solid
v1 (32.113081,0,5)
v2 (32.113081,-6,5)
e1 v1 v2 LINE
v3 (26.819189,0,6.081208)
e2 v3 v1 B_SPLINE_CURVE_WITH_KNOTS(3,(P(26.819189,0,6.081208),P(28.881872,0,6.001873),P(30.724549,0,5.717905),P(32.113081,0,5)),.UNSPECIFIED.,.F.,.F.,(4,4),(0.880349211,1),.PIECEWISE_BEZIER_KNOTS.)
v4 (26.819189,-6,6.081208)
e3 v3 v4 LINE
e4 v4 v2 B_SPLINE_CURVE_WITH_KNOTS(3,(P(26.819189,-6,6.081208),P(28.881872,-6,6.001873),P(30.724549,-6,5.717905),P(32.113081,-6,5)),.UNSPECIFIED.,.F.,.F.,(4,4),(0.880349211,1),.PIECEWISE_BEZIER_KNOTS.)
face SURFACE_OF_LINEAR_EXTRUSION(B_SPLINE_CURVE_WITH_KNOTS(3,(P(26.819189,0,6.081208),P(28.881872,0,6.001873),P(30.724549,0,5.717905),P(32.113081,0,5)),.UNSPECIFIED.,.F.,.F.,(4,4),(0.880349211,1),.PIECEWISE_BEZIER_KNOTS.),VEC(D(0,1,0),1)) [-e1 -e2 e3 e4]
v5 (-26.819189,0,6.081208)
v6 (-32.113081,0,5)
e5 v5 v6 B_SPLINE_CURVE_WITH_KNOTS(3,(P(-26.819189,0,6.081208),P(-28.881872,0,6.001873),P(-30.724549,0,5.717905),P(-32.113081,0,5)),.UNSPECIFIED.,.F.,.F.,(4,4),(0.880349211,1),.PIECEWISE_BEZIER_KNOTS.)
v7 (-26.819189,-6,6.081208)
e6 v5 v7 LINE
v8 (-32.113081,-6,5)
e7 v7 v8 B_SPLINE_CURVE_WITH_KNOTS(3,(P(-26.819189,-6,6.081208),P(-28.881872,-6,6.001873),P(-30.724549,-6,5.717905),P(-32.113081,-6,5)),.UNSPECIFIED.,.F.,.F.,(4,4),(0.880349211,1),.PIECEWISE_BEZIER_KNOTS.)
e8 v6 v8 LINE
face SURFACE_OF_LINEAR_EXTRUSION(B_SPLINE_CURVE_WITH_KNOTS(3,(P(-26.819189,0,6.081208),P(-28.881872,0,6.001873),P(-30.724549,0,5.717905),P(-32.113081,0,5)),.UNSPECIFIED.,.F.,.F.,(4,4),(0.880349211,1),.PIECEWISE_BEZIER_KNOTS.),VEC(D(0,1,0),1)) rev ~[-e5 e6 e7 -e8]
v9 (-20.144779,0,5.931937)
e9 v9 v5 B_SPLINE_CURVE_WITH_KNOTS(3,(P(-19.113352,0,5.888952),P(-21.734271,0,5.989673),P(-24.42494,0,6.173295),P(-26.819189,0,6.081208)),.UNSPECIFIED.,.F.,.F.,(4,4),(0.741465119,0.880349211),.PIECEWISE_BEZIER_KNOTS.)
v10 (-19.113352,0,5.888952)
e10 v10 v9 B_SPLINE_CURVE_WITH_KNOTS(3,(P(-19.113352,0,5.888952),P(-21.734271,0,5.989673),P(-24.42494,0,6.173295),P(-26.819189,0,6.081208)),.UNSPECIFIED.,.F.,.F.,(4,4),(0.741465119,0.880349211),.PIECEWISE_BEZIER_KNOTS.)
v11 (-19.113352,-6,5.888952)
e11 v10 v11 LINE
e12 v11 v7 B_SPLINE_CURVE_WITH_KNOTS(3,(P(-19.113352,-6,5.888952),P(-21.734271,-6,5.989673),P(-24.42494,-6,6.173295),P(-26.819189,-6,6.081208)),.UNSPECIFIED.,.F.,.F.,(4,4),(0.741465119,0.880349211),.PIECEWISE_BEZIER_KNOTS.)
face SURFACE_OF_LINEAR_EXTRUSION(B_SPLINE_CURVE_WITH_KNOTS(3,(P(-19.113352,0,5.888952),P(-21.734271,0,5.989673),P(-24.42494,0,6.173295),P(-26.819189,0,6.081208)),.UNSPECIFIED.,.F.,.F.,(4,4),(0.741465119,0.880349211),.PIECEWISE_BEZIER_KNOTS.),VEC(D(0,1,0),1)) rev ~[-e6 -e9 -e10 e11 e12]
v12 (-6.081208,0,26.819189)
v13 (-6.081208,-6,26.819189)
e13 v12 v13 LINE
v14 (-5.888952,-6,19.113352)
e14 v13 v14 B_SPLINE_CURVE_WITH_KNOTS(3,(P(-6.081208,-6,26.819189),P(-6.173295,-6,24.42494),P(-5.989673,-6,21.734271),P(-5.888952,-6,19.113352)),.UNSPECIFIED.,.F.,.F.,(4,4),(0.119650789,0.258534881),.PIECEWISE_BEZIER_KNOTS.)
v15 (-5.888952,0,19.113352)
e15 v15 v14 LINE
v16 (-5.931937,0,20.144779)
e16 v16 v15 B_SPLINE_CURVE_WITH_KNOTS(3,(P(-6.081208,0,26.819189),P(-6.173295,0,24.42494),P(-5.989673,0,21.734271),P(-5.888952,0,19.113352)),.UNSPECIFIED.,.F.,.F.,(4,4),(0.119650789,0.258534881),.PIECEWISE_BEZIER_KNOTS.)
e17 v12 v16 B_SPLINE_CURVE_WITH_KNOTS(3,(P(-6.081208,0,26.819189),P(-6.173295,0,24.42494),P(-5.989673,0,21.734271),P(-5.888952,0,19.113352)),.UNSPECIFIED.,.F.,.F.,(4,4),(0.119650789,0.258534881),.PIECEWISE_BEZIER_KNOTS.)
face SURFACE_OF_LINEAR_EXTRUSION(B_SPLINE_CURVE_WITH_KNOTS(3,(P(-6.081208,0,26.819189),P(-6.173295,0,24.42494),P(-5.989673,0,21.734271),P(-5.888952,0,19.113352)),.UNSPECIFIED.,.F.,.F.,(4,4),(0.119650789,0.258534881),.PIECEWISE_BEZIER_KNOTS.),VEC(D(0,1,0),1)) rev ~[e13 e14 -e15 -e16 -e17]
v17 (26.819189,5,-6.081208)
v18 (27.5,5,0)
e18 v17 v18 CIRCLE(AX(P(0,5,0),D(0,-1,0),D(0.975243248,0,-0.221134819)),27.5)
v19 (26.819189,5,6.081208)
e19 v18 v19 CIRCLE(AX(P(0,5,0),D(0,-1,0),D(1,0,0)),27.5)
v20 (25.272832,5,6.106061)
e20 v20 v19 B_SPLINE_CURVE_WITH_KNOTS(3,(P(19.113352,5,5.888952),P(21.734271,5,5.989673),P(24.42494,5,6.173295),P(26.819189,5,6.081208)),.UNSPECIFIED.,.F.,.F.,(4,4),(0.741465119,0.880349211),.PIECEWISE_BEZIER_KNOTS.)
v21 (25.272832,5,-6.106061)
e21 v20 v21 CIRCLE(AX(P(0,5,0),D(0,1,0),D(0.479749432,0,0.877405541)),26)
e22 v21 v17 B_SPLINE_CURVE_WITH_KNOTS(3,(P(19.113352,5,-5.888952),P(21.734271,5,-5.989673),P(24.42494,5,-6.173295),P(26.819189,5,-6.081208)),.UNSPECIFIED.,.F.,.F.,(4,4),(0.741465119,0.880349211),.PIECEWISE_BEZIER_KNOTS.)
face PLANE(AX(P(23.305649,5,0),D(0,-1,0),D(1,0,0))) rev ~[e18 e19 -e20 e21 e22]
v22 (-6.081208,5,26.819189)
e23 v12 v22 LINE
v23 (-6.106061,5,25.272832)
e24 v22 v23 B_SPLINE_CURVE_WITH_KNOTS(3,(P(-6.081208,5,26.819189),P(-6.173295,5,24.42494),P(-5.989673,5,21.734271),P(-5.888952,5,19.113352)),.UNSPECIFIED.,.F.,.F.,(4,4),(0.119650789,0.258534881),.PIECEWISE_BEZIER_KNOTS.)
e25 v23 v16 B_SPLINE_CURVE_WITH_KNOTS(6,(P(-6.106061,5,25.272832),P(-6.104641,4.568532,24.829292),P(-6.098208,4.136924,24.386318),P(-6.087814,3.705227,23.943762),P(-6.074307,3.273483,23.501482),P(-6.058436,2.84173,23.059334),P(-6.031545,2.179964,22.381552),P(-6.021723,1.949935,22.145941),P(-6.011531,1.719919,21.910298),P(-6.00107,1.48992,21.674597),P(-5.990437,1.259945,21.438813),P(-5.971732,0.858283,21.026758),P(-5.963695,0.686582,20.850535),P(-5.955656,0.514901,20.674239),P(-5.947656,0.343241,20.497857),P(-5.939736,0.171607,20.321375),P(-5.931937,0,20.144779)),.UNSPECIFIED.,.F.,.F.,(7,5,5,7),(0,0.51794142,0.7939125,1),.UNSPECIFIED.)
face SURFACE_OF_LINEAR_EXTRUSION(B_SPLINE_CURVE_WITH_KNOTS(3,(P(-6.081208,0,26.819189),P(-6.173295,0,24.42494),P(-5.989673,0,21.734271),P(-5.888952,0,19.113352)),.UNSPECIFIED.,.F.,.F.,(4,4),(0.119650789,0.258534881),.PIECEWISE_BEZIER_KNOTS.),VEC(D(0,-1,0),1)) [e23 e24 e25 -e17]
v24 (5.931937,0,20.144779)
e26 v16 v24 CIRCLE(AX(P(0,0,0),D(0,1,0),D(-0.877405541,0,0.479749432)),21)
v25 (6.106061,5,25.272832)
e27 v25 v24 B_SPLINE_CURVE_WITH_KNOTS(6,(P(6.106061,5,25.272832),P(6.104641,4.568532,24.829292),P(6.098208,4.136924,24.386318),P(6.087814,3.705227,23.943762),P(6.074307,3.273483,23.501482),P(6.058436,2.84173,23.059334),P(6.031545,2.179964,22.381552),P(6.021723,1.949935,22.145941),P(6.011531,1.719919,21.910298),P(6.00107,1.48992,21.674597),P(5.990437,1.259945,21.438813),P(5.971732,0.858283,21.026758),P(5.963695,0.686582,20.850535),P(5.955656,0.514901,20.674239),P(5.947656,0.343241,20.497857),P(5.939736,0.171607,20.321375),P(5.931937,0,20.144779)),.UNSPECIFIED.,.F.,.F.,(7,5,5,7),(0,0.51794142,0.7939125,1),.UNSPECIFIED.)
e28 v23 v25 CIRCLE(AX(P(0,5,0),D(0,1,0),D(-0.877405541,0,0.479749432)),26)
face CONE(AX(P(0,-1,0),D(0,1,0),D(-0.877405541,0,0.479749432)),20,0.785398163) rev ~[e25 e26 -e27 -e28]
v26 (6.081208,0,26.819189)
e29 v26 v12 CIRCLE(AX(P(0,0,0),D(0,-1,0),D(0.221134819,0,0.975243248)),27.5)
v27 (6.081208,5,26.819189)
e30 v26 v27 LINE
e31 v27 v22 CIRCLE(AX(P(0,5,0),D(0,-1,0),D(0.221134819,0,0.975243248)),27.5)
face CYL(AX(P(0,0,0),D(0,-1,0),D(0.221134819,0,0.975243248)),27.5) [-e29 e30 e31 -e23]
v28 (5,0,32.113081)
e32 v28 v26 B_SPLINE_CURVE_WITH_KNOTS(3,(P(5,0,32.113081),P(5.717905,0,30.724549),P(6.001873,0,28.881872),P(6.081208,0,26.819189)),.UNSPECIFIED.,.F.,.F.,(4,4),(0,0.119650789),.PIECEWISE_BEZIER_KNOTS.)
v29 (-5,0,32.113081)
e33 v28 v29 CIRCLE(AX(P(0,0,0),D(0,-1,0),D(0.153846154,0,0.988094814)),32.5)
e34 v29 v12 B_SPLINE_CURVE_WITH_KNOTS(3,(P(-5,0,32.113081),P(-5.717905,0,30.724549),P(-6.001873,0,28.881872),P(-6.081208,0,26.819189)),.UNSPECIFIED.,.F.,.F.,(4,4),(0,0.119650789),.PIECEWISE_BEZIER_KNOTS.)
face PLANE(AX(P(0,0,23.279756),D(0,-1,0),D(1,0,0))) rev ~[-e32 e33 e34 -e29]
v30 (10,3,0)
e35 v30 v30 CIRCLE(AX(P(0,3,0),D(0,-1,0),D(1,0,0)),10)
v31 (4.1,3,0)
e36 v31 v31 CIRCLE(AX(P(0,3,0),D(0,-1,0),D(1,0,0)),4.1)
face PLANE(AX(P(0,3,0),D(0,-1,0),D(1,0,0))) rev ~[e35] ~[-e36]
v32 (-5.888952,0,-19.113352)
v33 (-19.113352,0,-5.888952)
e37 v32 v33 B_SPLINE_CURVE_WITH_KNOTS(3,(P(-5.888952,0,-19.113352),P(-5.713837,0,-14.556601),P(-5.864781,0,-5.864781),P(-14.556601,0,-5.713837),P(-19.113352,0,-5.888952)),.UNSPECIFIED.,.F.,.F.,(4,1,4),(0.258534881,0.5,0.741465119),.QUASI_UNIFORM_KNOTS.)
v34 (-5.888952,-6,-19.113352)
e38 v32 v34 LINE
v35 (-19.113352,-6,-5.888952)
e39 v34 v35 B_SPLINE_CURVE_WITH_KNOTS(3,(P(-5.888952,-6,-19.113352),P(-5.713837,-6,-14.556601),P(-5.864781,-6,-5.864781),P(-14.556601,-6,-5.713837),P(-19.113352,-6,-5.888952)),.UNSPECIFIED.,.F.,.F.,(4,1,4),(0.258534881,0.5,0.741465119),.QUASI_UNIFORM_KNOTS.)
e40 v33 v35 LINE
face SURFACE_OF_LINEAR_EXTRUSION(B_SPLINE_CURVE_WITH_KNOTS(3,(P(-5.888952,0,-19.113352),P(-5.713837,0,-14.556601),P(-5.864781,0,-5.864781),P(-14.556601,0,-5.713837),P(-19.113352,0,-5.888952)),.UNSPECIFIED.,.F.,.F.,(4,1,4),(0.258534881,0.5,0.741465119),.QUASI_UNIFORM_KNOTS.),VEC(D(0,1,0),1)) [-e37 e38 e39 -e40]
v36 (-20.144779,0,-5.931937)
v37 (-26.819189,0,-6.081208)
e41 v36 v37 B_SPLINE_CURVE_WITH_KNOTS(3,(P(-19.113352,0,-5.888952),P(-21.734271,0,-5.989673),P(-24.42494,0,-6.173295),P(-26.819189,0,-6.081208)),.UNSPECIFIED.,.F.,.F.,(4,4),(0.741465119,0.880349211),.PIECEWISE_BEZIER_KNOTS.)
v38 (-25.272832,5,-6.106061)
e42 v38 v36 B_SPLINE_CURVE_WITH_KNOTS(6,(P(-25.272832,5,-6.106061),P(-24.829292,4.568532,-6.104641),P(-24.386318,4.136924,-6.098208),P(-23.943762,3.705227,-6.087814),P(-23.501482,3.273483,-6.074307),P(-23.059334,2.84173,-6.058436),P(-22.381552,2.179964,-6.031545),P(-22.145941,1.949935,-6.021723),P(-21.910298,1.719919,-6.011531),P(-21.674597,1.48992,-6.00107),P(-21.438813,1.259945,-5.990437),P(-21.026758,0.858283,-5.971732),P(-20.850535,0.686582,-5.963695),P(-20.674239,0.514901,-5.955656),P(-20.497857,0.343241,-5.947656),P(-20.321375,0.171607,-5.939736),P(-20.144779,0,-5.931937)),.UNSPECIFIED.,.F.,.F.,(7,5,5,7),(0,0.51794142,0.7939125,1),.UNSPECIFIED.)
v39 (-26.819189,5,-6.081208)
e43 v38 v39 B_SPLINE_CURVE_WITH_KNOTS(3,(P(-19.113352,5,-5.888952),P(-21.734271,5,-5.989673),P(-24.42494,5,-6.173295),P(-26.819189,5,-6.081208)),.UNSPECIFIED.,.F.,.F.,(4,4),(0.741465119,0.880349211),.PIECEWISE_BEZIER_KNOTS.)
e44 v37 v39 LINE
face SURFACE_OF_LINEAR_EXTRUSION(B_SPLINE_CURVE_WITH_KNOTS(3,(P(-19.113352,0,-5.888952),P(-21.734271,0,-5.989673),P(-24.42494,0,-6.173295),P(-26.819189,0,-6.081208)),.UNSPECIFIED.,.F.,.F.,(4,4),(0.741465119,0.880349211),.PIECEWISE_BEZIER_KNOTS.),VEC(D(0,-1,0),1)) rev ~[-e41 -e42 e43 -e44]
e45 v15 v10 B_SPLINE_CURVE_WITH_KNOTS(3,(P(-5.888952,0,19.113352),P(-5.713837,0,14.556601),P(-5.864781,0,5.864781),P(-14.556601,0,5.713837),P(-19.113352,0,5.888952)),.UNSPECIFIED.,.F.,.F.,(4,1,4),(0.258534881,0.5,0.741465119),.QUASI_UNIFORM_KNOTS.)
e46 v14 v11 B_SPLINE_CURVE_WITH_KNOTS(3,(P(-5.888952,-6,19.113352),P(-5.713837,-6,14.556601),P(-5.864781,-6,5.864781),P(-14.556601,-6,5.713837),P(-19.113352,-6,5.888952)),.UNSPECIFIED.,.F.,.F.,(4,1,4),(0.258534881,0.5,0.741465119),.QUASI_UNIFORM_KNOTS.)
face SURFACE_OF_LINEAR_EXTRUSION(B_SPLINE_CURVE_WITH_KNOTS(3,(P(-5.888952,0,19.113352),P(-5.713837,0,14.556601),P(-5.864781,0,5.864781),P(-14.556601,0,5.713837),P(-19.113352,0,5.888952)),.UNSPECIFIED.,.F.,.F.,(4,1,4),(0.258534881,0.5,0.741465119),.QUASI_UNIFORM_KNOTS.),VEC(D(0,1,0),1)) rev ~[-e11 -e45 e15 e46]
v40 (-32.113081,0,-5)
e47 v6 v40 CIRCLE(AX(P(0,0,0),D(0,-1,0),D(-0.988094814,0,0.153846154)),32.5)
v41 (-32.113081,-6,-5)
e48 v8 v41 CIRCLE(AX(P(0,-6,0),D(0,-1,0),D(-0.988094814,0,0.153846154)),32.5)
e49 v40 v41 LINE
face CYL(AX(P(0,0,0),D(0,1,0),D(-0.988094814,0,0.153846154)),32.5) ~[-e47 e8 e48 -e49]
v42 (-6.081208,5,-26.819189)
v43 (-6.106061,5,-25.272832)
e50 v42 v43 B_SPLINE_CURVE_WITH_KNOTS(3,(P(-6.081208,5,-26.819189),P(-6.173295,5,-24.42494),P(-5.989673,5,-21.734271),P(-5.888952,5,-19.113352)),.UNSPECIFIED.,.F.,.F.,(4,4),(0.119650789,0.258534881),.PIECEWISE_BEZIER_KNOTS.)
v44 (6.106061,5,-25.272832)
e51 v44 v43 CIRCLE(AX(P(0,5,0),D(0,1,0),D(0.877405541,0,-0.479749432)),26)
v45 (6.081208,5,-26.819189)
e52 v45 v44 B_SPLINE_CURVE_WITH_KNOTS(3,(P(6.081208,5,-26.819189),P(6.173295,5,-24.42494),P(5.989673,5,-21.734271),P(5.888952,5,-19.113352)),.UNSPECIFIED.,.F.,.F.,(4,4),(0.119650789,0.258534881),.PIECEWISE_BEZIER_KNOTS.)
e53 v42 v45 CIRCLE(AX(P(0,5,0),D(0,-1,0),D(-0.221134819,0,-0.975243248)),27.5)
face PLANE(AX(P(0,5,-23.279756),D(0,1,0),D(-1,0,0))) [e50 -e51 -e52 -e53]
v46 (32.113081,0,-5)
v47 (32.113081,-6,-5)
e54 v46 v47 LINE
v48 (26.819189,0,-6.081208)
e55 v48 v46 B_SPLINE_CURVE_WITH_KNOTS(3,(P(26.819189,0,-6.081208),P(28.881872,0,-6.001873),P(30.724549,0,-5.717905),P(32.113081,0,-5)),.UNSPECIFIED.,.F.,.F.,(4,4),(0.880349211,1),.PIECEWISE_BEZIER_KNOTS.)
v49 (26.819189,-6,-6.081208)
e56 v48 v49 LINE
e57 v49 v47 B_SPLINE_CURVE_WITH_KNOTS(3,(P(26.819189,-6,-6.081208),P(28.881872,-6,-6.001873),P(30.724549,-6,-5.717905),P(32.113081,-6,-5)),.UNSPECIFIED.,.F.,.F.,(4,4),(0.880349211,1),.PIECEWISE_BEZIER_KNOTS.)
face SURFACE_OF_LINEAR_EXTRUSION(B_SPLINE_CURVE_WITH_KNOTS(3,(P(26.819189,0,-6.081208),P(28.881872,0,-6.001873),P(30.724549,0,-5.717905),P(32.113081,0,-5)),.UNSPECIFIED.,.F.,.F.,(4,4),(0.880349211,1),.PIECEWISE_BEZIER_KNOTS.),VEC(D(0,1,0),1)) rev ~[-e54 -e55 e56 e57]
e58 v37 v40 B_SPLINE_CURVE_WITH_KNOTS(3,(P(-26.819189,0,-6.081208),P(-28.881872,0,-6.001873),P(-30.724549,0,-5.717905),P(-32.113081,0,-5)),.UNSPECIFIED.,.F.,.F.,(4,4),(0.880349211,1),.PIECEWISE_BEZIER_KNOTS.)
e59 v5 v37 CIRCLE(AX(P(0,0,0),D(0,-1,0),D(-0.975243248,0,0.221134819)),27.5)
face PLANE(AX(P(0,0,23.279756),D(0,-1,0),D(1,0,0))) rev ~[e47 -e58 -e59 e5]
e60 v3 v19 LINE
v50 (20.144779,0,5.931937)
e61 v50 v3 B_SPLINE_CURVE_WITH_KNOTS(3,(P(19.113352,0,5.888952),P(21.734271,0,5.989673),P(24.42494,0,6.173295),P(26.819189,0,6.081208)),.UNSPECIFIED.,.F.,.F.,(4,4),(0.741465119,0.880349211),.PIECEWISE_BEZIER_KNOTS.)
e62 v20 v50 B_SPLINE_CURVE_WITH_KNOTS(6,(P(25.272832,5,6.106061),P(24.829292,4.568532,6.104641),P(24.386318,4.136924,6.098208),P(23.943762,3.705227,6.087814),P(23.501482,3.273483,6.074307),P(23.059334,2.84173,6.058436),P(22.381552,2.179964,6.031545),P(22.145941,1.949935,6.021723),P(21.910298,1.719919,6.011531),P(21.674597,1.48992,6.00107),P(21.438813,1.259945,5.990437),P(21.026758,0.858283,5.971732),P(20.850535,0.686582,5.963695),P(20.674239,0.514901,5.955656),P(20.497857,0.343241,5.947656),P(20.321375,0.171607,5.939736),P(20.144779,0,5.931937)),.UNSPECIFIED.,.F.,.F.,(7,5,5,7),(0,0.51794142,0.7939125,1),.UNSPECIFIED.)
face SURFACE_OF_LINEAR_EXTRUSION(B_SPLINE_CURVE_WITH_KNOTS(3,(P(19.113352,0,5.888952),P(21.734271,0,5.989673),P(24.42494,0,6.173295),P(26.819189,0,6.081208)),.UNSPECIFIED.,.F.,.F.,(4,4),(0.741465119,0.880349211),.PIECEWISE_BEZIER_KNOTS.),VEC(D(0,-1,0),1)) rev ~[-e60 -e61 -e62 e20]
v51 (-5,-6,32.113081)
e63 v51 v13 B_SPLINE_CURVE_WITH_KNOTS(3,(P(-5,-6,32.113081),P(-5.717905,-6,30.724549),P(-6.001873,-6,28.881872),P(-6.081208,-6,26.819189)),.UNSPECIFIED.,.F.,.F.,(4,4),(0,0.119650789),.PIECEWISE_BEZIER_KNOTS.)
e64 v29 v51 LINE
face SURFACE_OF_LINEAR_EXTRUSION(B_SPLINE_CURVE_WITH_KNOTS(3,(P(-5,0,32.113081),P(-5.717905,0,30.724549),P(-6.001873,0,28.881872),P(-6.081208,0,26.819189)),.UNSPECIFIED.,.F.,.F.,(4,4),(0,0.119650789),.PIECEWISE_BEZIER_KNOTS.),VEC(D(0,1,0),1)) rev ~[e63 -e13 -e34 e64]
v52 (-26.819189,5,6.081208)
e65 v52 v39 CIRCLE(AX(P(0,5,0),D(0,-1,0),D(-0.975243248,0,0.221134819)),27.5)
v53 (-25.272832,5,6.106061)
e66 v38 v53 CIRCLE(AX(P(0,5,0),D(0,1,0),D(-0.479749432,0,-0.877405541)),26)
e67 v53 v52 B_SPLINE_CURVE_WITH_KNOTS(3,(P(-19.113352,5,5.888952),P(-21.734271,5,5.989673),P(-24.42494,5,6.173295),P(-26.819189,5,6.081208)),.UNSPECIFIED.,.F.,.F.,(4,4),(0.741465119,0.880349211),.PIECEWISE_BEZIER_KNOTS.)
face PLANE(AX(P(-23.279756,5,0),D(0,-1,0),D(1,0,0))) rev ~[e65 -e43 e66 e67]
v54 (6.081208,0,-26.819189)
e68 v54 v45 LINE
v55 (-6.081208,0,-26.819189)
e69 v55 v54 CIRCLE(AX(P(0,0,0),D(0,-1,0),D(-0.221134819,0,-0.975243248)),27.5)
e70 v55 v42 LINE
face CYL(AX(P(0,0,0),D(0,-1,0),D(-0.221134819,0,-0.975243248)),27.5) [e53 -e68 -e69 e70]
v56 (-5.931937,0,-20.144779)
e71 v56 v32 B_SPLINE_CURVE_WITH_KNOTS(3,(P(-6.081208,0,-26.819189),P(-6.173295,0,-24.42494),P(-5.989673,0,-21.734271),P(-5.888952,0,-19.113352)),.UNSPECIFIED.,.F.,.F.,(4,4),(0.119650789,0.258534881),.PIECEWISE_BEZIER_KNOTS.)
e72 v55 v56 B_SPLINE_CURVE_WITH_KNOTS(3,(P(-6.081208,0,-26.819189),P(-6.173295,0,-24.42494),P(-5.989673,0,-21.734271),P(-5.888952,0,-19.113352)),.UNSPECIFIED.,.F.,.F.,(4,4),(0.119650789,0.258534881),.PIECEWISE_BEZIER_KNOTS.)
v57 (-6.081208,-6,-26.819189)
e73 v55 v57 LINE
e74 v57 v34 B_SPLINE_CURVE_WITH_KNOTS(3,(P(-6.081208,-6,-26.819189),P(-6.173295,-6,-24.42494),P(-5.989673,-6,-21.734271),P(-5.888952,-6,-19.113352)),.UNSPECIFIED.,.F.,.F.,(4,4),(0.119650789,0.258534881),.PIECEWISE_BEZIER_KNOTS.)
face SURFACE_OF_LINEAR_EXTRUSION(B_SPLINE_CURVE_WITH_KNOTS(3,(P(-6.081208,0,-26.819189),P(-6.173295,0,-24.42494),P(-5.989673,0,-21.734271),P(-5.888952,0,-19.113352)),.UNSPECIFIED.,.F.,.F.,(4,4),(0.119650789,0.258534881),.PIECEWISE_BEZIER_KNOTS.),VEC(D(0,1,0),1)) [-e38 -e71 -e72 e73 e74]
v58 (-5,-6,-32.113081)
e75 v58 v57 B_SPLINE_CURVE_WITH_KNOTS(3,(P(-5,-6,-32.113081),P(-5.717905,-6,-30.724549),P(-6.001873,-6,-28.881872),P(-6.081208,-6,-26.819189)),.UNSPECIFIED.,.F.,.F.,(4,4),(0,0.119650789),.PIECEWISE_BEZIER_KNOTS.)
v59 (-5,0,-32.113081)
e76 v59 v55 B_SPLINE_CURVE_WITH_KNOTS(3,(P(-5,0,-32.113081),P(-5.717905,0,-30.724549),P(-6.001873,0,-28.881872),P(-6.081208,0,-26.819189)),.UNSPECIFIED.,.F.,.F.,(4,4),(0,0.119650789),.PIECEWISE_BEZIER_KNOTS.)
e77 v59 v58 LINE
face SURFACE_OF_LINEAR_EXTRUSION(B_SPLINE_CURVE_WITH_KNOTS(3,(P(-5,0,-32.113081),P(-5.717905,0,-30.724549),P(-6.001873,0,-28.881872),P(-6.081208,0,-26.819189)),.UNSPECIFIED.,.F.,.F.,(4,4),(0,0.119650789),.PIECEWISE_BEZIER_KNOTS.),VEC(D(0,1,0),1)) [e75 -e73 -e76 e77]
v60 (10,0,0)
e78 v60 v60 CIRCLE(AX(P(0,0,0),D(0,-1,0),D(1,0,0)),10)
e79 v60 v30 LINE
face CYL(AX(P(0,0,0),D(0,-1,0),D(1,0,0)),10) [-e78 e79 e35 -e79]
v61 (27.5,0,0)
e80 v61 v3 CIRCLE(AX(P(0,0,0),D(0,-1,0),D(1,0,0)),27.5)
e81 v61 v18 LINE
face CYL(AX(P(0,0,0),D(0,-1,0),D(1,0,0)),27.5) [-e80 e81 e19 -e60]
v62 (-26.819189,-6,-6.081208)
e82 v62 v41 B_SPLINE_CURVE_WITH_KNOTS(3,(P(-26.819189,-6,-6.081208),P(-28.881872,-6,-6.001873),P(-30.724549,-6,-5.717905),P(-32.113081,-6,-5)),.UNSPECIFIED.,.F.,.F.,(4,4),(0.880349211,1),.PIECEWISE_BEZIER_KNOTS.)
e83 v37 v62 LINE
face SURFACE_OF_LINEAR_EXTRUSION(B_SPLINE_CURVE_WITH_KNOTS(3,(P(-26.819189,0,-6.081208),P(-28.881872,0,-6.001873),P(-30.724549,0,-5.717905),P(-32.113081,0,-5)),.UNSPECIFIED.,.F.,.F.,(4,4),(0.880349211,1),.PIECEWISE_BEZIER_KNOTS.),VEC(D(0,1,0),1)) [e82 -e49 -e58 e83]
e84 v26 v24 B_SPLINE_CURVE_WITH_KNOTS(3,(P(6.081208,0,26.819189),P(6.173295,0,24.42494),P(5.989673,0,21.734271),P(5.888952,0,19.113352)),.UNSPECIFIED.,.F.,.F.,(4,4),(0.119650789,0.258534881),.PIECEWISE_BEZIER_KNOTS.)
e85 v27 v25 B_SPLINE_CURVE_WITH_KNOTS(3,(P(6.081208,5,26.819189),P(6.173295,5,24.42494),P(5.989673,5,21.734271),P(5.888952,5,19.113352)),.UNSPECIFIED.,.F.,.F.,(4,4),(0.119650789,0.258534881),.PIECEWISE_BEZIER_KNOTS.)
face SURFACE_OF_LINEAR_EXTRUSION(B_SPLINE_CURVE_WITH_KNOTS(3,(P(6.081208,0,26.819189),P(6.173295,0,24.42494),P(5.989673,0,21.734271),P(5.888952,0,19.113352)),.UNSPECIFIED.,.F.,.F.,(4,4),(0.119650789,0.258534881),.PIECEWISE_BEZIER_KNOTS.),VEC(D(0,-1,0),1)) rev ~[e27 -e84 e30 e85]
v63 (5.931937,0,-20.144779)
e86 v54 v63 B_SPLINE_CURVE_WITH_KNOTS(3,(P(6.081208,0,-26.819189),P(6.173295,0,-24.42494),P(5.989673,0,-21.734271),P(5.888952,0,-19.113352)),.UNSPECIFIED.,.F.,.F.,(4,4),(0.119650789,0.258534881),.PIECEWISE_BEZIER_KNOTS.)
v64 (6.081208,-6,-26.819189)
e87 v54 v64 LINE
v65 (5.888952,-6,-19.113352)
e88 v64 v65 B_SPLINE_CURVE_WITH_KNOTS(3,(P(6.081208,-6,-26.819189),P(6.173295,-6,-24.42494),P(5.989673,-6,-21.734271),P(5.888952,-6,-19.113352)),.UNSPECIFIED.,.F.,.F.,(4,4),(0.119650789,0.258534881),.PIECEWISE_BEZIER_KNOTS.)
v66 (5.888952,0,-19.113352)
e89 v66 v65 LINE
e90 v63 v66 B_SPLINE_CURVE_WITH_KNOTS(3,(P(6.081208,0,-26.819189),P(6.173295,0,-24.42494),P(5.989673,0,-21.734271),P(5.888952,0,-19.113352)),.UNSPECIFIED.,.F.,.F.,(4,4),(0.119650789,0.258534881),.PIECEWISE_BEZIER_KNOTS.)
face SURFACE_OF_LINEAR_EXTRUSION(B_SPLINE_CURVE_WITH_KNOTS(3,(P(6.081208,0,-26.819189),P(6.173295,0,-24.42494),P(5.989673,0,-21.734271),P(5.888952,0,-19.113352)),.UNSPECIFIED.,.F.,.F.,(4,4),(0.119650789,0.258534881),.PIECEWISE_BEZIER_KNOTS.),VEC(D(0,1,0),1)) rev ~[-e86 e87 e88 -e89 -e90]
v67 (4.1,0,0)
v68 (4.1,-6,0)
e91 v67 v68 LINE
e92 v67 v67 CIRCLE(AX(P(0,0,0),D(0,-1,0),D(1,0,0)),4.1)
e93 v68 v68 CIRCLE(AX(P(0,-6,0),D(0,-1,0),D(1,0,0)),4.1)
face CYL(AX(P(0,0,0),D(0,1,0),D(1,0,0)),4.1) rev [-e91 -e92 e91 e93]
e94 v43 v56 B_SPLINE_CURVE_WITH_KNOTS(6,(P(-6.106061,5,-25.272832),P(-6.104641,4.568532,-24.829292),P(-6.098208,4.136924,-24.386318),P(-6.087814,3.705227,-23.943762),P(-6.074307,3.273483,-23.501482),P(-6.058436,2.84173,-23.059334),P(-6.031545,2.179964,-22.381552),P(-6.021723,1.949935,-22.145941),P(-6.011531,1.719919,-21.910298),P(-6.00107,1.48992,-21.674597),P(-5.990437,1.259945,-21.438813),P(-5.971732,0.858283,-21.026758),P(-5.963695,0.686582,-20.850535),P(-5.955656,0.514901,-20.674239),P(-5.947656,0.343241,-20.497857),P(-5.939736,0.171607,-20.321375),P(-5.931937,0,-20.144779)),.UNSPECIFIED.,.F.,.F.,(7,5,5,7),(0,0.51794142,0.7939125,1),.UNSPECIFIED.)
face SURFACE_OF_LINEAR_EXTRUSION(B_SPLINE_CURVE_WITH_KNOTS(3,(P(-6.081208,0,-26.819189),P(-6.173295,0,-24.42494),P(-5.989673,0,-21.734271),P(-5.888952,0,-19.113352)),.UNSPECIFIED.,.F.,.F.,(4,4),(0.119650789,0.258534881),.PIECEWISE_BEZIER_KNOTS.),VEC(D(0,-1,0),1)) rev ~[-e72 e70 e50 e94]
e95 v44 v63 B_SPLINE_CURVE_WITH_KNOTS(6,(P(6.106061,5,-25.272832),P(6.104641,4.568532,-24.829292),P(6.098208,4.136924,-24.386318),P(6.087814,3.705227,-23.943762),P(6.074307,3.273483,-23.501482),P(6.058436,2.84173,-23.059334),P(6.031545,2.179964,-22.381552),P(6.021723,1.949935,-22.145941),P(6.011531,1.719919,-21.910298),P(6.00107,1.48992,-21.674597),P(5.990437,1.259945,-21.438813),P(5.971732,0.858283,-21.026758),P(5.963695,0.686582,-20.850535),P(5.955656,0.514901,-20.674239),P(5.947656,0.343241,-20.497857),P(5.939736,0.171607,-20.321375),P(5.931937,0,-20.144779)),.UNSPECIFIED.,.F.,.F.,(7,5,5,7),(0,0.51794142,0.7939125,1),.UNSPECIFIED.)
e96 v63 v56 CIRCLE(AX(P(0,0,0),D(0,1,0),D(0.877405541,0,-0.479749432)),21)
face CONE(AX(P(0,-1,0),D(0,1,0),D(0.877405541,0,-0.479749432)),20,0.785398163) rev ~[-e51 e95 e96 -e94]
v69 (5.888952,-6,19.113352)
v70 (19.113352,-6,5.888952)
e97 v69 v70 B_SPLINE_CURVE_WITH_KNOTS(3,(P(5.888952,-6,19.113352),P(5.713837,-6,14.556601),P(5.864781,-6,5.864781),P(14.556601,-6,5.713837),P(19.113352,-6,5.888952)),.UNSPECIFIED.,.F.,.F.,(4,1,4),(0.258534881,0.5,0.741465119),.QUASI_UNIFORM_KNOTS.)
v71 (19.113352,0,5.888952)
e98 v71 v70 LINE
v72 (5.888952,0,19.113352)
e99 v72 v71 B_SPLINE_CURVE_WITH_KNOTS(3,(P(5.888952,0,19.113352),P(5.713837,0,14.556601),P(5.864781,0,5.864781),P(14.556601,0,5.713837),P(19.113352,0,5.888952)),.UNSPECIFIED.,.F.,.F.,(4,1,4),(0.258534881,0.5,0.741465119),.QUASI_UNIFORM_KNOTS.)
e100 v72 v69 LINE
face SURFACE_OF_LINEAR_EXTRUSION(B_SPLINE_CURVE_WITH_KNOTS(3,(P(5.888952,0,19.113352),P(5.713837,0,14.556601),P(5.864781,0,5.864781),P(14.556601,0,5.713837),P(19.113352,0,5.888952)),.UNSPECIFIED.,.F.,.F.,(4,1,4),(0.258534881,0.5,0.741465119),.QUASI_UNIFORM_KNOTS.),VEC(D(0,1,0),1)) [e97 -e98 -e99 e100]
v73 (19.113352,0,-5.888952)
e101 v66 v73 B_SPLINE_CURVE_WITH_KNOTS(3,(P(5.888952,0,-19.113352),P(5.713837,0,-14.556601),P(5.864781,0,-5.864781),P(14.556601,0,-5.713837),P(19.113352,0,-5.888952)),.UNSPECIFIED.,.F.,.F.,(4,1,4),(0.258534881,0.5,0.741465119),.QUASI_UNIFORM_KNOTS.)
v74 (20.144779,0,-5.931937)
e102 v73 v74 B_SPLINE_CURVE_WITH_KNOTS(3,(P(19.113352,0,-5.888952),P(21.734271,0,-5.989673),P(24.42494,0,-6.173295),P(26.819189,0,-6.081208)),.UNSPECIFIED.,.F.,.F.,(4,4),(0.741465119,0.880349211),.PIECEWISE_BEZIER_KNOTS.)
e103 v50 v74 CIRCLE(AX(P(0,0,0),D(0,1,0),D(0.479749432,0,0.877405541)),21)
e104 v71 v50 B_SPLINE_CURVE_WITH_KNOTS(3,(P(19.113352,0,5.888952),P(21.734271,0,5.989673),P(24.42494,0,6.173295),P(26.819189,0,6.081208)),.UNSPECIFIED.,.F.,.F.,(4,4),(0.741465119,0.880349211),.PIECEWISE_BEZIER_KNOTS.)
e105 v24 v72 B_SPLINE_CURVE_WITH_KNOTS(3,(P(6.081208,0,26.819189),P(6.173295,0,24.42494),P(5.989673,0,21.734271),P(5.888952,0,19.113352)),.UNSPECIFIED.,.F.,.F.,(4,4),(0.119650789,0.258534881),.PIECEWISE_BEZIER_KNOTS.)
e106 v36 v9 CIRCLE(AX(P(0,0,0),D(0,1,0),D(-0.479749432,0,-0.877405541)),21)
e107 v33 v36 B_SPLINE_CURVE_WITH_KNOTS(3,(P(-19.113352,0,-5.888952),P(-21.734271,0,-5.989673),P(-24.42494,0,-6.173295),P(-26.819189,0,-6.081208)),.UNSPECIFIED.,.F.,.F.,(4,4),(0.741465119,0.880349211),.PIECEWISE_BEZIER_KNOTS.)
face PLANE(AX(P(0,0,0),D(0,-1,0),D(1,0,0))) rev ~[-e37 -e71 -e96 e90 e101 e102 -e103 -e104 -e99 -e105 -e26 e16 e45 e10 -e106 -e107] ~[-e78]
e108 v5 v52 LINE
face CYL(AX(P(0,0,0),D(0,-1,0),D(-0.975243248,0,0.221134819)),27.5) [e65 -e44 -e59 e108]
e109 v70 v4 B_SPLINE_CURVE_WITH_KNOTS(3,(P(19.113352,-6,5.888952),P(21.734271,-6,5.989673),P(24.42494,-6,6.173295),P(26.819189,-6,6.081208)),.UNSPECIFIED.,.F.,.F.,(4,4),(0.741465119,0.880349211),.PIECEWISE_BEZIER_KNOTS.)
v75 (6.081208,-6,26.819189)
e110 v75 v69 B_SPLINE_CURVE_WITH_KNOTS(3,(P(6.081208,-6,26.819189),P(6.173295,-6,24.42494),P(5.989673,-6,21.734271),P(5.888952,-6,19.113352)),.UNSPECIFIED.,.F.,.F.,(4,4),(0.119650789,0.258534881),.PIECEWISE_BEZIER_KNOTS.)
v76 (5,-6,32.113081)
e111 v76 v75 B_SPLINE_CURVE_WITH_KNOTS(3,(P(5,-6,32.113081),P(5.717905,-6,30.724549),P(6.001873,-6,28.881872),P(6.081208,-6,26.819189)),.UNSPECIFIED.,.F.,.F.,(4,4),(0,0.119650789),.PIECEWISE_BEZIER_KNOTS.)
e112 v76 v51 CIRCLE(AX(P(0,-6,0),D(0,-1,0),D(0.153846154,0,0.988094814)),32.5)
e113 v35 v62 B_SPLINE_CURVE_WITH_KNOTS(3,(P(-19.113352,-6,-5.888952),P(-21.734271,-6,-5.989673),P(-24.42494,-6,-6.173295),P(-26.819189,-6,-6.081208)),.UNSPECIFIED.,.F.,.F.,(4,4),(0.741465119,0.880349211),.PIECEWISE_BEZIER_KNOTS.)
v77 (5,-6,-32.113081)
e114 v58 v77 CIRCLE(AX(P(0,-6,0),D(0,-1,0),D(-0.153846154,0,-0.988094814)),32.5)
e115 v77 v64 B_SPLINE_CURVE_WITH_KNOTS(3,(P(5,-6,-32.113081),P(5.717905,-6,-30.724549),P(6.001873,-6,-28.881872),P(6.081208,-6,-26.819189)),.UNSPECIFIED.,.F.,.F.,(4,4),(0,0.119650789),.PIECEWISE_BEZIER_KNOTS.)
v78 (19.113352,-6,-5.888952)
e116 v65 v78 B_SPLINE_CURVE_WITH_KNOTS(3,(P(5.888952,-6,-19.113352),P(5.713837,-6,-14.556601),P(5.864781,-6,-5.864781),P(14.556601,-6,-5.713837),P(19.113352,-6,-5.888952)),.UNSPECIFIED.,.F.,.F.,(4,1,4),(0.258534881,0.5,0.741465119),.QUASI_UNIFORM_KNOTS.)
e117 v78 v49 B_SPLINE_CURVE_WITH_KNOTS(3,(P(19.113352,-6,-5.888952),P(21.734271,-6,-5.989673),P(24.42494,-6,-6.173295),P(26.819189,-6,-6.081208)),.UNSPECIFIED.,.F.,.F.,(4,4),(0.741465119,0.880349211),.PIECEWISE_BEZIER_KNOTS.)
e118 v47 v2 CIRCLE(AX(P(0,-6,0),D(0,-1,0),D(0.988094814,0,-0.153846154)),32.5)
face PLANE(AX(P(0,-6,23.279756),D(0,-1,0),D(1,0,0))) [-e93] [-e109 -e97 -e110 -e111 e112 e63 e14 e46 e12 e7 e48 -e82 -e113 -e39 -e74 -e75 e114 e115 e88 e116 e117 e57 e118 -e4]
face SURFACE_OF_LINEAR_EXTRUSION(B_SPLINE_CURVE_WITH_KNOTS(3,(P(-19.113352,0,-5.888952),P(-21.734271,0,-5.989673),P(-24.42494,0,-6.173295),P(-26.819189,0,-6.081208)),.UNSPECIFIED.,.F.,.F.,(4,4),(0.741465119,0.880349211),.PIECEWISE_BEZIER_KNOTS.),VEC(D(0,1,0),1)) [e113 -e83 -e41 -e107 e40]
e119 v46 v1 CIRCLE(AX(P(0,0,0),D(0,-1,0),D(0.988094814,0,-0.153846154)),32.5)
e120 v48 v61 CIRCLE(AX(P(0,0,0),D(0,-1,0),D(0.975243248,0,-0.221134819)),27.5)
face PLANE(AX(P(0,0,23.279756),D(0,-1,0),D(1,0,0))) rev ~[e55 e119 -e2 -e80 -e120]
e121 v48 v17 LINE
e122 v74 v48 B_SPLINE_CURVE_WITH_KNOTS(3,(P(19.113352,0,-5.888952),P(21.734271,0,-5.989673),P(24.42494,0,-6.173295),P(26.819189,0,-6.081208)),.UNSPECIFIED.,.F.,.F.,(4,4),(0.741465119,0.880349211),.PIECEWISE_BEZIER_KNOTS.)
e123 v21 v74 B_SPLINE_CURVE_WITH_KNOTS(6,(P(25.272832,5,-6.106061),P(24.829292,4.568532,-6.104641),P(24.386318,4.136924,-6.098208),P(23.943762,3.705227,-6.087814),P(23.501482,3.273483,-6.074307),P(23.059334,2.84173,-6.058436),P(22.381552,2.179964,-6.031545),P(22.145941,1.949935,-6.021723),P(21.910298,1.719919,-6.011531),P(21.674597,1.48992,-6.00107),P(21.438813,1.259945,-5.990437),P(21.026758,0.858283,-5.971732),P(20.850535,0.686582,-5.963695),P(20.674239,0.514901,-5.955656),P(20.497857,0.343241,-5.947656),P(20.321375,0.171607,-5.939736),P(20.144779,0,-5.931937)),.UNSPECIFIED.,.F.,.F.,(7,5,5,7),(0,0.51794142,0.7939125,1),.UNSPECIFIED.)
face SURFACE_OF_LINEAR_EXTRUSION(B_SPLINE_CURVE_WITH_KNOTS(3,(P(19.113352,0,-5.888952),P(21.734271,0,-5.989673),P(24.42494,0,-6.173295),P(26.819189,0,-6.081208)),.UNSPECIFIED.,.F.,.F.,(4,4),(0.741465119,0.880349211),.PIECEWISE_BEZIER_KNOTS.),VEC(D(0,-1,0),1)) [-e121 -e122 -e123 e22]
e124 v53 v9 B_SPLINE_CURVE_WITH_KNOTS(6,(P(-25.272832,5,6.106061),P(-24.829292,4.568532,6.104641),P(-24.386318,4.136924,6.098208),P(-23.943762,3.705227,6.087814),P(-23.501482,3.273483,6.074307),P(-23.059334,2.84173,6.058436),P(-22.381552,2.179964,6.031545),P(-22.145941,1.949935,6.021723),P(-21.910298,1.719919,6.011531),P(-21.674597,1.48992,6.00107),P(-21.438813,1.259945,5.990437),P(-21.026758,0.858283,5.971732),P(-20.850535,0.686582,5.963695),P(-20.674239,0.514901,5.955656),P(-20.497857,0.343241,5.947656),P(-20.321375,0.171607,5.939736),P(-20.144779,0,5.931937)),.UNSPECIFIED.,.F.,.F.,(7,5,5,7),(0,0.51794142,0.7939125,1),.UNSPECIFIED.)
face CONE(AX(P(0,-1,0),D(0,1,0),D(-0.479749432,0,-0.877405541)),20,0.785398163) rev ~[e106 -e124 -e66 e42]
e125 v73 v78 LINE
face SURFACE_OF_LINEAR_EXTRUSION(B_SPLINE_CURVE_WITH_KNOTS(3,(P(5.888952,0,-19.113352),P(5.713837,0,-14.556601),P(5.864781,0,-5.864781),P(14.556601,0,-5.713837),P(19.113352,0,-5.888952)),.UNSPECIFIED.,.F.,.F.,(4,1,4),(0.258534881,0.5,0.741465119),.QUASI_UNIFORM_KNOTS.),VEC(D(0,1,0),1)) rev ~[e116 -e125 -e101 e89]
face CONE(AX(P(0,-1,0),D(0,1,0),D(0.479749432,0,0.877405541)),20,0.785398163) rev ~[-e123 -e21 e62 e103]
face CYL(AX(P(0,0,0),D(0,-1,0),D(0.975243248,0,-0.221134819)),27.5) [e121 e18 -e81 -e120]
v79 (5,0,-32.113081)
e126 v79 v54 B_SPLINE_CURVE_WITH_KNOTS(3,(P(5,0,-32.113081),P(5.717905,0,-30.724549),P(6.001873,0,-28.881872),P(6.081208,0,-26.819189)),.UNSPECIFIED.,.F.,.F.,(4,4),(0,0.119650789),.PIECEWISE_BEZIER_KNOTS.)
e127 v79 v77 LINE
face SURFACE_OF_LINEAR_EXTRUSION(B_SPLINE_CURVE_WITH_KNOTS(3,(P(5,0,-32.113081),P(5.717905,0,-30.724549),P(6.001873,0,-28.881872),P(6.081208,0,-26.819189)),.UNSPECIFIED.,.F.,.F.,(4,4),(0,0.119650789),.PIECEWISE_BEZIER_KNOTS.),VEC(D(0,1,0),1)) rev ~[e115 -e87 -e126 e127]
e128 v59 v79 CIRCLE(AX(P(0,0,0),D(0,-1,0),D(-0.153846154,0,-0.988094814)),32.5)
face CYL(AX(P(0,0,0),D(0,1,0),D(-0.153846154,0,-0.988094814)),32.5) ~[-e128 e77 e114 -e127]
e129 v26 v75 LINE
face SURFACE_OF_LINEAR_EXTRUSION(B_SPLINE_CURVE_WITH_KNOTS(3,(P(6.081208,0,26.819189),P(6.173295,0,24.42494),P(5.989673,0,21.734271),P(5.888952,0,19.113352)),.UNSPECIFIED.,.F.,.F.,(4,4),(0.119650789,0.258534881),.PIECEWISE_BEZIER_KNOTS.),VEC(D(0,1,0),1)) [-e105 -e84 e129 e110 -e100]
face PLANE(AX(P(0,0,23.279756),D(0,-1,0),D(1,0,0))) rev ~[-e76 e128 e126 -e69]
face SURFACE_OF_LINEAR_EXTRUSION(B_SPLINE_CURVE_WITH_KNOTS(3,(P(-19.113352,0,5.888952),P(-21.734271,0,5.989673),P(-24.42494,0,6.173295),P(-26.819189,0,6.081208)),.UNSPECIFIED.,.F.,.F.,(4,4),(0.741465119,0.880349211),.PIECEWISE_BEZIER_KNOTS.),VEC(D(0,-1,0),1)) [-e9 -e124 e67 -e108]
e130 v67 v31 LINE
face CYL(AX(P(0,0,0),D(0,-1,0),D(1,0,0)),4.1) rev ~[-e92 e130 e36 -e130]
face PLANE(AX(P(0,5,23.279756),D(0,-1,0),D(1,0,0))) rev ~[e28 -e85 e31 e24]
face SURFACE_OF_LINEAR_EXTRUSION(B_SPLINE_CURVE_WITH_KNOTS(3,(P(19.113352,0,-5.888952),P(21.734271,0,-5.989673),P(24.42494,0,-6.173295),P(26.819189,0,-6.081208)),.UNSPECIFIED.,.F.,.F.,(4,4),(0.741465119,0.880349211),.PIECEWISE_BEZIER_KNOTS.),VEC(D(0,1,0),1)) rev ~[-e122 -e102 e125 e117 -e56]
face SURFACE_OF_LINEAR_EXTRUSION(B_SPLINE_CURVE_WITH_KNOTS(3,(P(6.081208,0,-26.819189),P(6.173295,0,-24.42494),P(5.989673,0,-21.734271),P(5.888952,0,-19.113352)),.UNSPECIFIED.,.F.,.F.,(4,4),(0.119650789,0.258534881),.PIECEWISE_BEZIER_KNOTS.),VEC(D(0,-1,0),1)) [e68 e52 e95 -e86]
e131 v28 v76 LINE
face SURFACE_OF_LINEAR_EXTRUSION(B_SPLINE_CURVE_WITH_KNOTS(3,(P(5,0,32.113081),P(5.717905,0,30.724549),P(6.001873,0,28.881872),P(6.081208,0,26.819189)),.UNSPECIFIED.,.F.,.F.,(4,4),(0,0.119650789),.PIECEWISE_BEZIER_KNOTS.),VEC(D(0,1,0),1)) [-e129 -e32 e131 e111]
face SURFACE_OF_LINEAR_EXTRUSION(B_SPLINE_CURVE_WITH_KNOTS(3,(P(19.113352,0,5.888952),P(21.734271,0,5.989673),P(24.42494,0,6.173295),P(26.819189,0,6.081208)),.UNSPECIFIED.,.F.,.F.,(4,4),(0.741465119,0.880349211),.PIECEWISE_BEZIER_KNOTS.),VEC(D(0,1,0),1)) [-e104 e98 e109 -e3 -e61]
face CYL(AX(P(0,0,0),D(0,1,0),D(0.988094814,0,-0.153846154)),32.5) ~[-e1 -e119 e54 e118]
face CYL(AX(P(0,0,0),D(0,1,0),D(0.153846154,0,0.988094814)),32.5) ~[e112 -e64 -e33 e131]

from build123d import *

# Parameters (mm, degrees)
F0_R         = 10
F0_R_2       = 4.1
F1_DEPTH     = 6
F2_DEPTH     = 5
F3_T4_ANGLE  = 122.6619234407
F3_T9_ANGLE  = 122.6619234407
F3_T14_ANGLE = 122.6619234407
F3_T19_ANGLE = 122.6619234407
F4_DEPTH     = 3


# Not quite as in the source:
# - a fillet or chamfer that OpenCascade refuses, or shapes differently, is made with other operations: its cross-section is extruded or revolved along the edge and cut away or added


with BuildPart() as f1:
    # F0 (on Front) → F1 (new body)
    with BuildSketch(Plane.XZ):
        with BuildLine():
            ThreePointArc((6.0812075174, 26.8191893079), (0, 27.5), (-6.0812075174, 26.8191893079))
            add(Edge.make_bspline(
                [(-6.0812075174, 26.8191893079), (-6.1732948606, 24.4249400285), (-5.9896734895, 21.7342705806), (-5.8889521452, 19.1133524697)],
                knots=[0.1196507891, 0.1196507891, 0.1196507891, 0.1196507891, 0.2585348809, 0.2585348809, 0.2585348809, 0.2585348809], degree=3))
            ThreePointArc((-5.8889521452, 19.1133524697), (0, 20), (5.8889521452, 19.1133524697))
            add(Edge.make_bspline(
                [(6.0812075174, 26.8191893079), (6.1732948606, 24.4249400285), (5.9896734895, 21.7342705806), (5.8889521452, 19.1133524697)],
                knots=[0.1196507891, 0.1196507891, 0.1196507891, 0.1196507891, 0.2585348809, 0.2585348809, 0.2585348809, 0.2585348809], degree=3))
        make_face()
        with BuildLine():
            add(Edge.make_bspline(
                [(26.8191893079, 6.0812075174), (28.8818720221, 6.0018728496), (30.7245490644, 5.7179047345), (32.1130814467, 5)],
                knots=[0.8803492109, 0.8803492109, 0.8803492109, 0.8803492109, 1, 1, 1, 1], degree=3))
            ThreePointArc((26.8191893079, 6.0812075174), (27.3292673334, 3.0595991595), (27.5, 0))
            ThreePointArc((27.5, 0), (27.3292673334, -3.0595991595), (26.8191893079, -6.0812075174))
            add(Edge.make_bspline(
                [(26.8191893079, -6.0812075174), (28.8818720221, -6.0018728496), (30.7245490644, -5.7179047345), (32.1130814467, -5)],
                knots=[0.8803492109, 0.8803492109, 0.8803492109, 0.8803492109, 1, 1, 1, 1], degree=3))
            ThreePointArc((32.1130814467, -5), (32.4031259836, -2.5074741258), (32.5, 0))
            ThreePointArc((32.5, 0), (32.4031259836, 2.5074741258), (32.1130814467, 5))
        make_face()
        with BuildLine():
            ThreePointArc((5, 32.1130814467), (0, 32.5), (-5, 32.1130814467))
            add(Edge.make_bspline(
                [(-5, 32.1130814467), (-5.7179047345, 30.7245490644), (-6.0018728496, 28.8818720221), (-6.0812075174, 26.8191893079)],
                knots=[0, 0, 0, 0, 0.1196507891, 0.1196507891, 0.1196507891, 0.1196507891], degree=3))
            ThreePointArc((-6.0812075174, 26.8191893079), (0, 27.5), (6.0812075174, 26.8191893079))
            add(Edge.make_bspline(
                [(5, 32.1130814467), (5.7179047345, 30.7245490644), (6.0018728496, 28.8818720221), (6.0812075174, 26.8191893079)],
                knots=[0, 0, 0, 0, 0.1196507891, 0.1196507891, 0.1196507891, 0.1196507891], degree=3))
        make_face()
        with BuildLine():
            add(Edge.make_bspline(
                [(-5, -32.1130814467), (-5.7179047345, -30.7245490644), (-6.0018728496, -28.8818720221), (-6.0812075174, -26.8191893079)],
                knots=[0, 0, 0, 0, 0.1196507891, 0.1196507891, 0.1196507891, 0.1196507891], degree=3))
            ThreePointArc((-5, -32.1130814467), (0, -32.5), (5, -32.1130814467))
            add(Edge.make_bspline(
                [(5, -32.1130814467), (5.7179047345, -30.7245490644), (6.0018728496, -28.8818720221), (6.0812075174, -26.8191893079)],
                knots=[0, 0, 0, 0, 0.1196507891, 0.1196507891, 0.1196507891, 0.1196507891], degree=3))
            ThreePointArc((6.0812075174, -26.8191893079), (0, -27.5), (-6.0812075174, -26.8191893079))
        make_face()
        with BuildLine():
            add(Edge.make_bspline(
                [(-26.8191893079, 6.0812075174), (-28.8818720221, 6.0018728496), (-30.7245490644, 5.7179047345), (-32.1130814467, 5)],
                knots=[0.8803492109, 0.8803492109, 0.8803492109, 0.8803492109, 1, 1, 1, 1], degree=3))
            ThreePointArc((-32.1130814467, 5), (-32.5, 0), (-32.1130814467, -5))
            add(Edge.make_bspline(
                [(-26.8191893079, -6.0812075174), (-28.8818720221, -6.0018728496), (-30.7245490644, -5.7179047345), (-32.1130814467, -5)],
                knots=[0.8803492109, 0.8803492109, 0.8803492109, 0.8803492109, 1, 1, 1, 1], degree=3))
            ThreePointArc((-26.8191893079, -6.0812075174), (-27.5, 0), (-26.8191893079, 6.0812075174))
        make_face()
        with BuildLine():
            add(Edge.make_bspline(
                [(-5.8889521452, 19.1133524697), (-5.713837119, 14.556600899), (-5.864780991, 5.864780991), (-14.556600899, 5.713837119), (-19.1133524697, 5.8889521452)],
                knots=[0.2585348809, 0.2585348809, 0.2585348809, 0.2585348809, 0.5, 0.7414651191, 0.7414651191, 0.7414651191, 0.7414651191], degree=3))
            ThreePointArc((-19.1133524697, 5.8889521452), (-20, 0), (-19.1133524697, -5.8889521452))
            add(Edge.make_bspline(
                [(-5.8889521452, -19.1133524697), (-5.713837119, -14.556600899), (-5.864780991, -5.864780991), (-14.556600899, -5.713837119), (-19.1133524697, -5.8889521452)],
                knots=[0.2585348809, 0.2585348809, 0.2585348809, 0.2585348809, 0.5, 0.7414651191, 0.7414651191, 0.7414651191, 0.7414651191], degree=3))
            ThreePointArc((-5.8889521452, -19.1133524697), (0, -20), (5.8889521452, -19.1133524697))
            add(Edge.make_bspline(
                [(5.8889521452, -19.1133524697), (5.713837119, -14.556600899), (5.864780991, -5.864780991), (14.556600899, -5.713837119), (19.1133524697, -5.8889521452)],
                knots=[0.2585348809, 0.2585348809, 0.2585348809, 0.2585348809, 0.5, 0.7414651191, 0.7414651191, 0.7414651191, 0.7414651191], degree=3))
            ThreePointArc((19.1133524697, -5.8889521452), (19.7770959622, -2.9776627248), (20, 0))
            ThreePointArc((20, 0), (19.7770959622, 2.9776627248), (19.1133524697, 5.8889521452))
            add(Edge.make_bspline(
                [(5.8889521452, 19.1133524697), (5.713837119, 14.556600899), (5.864780991, 5.864780991), (14.556600899, 5.713837119), (19.1133524697, 5.8889521452)],
                knots=[0.2585348809, 0.2585348809, 0.2585348809, 0.2585348809, 0.5, 0.7414651191, 0.7414651191, 0.7414651191, 0.7414651191], degree=3))
            ThreePointArc((5.8889521452, 19.1133524697), (0, 20), (-5.8889521452, 19.1133524697))
        make_face()
        Circle(F0_R, mode=Mode.SUBTRACT)
        with BuildLine():
            add(Edge.make_bspline(
                [(-6.0812075174, -26.8191893079), (-6.1732948606, -24.4249400285), (-5.9896734895, -21.7342705806), (-5.8889521452, -19.1133524697)],
                knots=[0.1196507891, 0.1196507891, 0.1196507891, 0.1196507891, 0.2585348809, 0.2585348809, 0.2585348809, 0.2585348809], degree=3))
            ThreePointArc((-6.0812075174, -26.8191893079), (0, -27.5), (6.0812075174, -26.8191893079))
            add(Edge.make_bspline(
                [(6.0812075174, -26.8191893079), (6.1732948606, -24.4249400285), (5.9896734895, -21.7342705806), (5.8889521452, -19.1133524697)],
                knots=[0.1196507891, 0.1196507891, 0.1196507891, 0.1196507891, 0.2585348809, 0.2585348809, 0.2585348809, 0.2585348809], degree=3))
            ThreePointArc((5.8889521452, -19.1133524697), (0, -20), (-5.8889521452, -19.1133524697))
        make_face()
        with BuildLine():
            ThreePointArc((27.5, 0), (27.3292673334, 3.0595991595), (26.8191893079, 6.0812075174))
            add(Edge.make_bspline(
                [(19.1133524697, 5.8889521452), (21.7342705806, 5.9896734895), (24.4249400285, 6.1732948606), (26.8191893079, 6.0812075174)],
                knots=[0.7414651191, 0.7414651191, 0.7414651191, 0.7414651191, 0.8803492109, 0.8803492109, 0.8803492109, 0.8803492109], degree=3))
            ThreePointArc((19.1133524697, 5.8889521452), (19.7770959622, 2.9776627248), (20, 0))
            ThreePointArc((20, 0), (19.7770959622, -2.9776627248), (19.1133524697, -5.8889521452))
            add(Edge.make_bspline(
                [(19.1133524697, -5.8889521452), (21.7342705806, -5.9896734895), (24.4249400285, -6.1732948606), (26.8191893079, -6.0812075174)],
                knots=[0.7414651191, 0.7414651191, 0.7414651191, 0.7414651191, 0.8803492109, 0.8803492109, 0.8803492109, 0.8803492109], degree=3))
            ThreePointArc((26.8191893079, -6.0812075174), (27.3292673334, -3.0595991595), (27.5, 0))
        make_face()
        with BuildLine():
            add(Edge.make_bspline(
                [(-19.1133524697, 5.8889521452), (-21.7342705806, 5.9896734895), (-24.4249400285, 6.1732948606), (-26.8191893079, 6.0812075174)],
                knots=[0.7414651191, 0.7414651191, 0.7414651191, 0.7414651191, 0.8803492109, 0.8803492109, 0.8803492109, 0.8803492109], degree=3))
            ThreePointArc((-26.8191893079, 6.0812075174), (-27.5, 0), (-26.8191893079, -6.0812075174))
            add(Edge.make_bspline(
                [(-19.1133524697, -5.8889521452), (-21.7342705806, -5.9896734895), (-24.4249400285, -6.1732948606), (-26.8191893079, -6.0812075174)],
                knots=[0.7414651191, 0.7414651191, 0.7414651191, 0.7414651191, 0.8803492109, 0.8803492109, 0.8803492109, 0.8803492109], degree=3))
            ThreePointArc((-19.1133524697, -5.8889521452), (-20, 0), (-19.1133524697, 5.8889521452))
        make_face()
        Circle(F0_R)
        Circle(F0_R_2, mode=Mode.SUBTRACT)
    extrude(amount=F1_DEPTH)

    # F0 (on Front) → F2 (join)
    with BuildSketch(Plane.XZ):
        with BuildLine():
            ThreePointArc((6.0812075174, 26.8191893079), (0, 27.5), (-6.0812075174, 26.8191893079))
            add(Edge.make_bspline(
                [(-6.0812075174, 26.8191893079), (-6.1732948606, 24.4249400285), (-5.9896734895, 21.7342705806), (-5.8889521452, 19.1133524697)],
                knots=[0.1196507891, 0.1196507891, 0.1196507891, 0.1196507891, 0.2585348809, 0.2585348809, 0.2585348809, 0.2585348809], degree=3))
            ThreePointArc((-5.8889521452, 19.1133524697), (0, 20), (5.8889521452, 19.1133524697))
            add(Edge.make_bspline(
                [(6.0812075174, 26.8191893079), (6.1732948606, 24.4249400285), (5.9896734895, 21.7342705806), (5.8889521452, 19.1133524697)],
                knots=[0.1196507891, 0.1196507891, 0.1196507891, 0.1196507891, 0.2585348809, 0.2585348809, 0.2585348809, 0.2585348809], degree=3))
        make_face()
        with BuildLine():
            ThreePointArc((27.5, 0), (27.3292673334, 3.0595991595), (26.8191893079, 6.0812075174))
            add(Edge.make_bspline(
                [(19.1133524697, 5.8889521452), (21.7342705806, 5.9896734895), (24.4249400285, 6.1732948606), (26.8191893079, 6.0812075174)],
                knots=[0.7414651191, 0.7414651191, 0.7414651191, 0.7414651191, 0.8803492109, 0.8803492109, 0.8803492109, 0.8803492109], degree=3))
            ThreePointArc((19.1133524697, 5.8889521452), (19.7770959622, 2.9776627248), (20, 0))
            ThreePointArc((20, 0), (19.7770959622, -2.9776627248), (19.1133524697, -5.8889521452))
            add(Edge.make_bspline(
                [(19.1133524697, -5.8889521452), (21.7342705806, -5.9896734895), (24.4249400285, -6.1732948606), (26.8191893079, -6.0812075174)],
                knots=[0.7414651191, 0.7414651191, 0.7414651191, 0.7414651191, 0.8803492109, 0.8803492109, 0.8803492109, 0.8803492109], degree=3))
            ThreePointArc((26.8191893079, -6.0812075174), (27.3292673334, -3.0595991595), (27.5, 0))
        make_face()
        with BuildLine():
            add(Edge.make_bspline(
                [(-19.1133524697, 5.8889521452), (-21.7342705806, 5.9896734895), (-24.4249400285, 6.1732948606), (-26.8191893079, 6.0812075174)],
                knots=[0.7414651191, 0.7414651191, 0.7414651191, 0.7414651191, 0.8803492109, 0.8803492109, 0.8803492109, 0.8803492109], degree=3))
            ThreePointArc((-26.8191893079, 6.0812075174), (-27.5, 0), (-26.8191893079, -6.0812075174))
            add(Edge.make_bspline(
                [(-19.1133524697, -5.8889521452), (-21.7342705806, -5.9896734895), (-24.4249400285, -6.1732948606), (-26.8191893079, -6.0812075174)],
                knots=[0.7414651191, 0.7414651191, 0.7414651191, 0.7414651191, 0.8803492109, 0.8803492109, 0.8803492109, 0.8803492109], degree=3))
            ThreePointArc((-19.1133524697, -5.8889521452), (-20, 0), (-19.1133524697, 5.8889521452))
        make_face()
        with BuildLine():
            add(Edge.make_bspline(
                [(-6.0812075174, -26.8191893079), (-6.1732948606, -24.4249400285), (-5.9896734895, -21.7342705806), (-5.8889521452, -19.1133524697)],
                knots=[0.1196507891, 0.1196507891, 0.1196507891, 0.1196507891, 0.2585348809, 0.2585348809, 0.2585348809, 0.2585348809], degree=3))
            ThreePointArc((-6.0812075174, -26.8191893079), (0, -27.5), (6.0812075174, -26.8191893079))
            add(Edge.make_bspline(
                [(6.0812075174, -26.8191893079), (6.1732948606, -24.4249400285), (5.9896734895, -21.7342705806), (5.8889521452, -19.1133524697)],
                knots=[0.1196507891, 0.1196507891, 0.1196507891, 0.1196507891, 0.2585348809, 0.2585348809, 0.2585348809, 0.2585348809], degree=3))
            ThreePointArc((5.8889521452, -19.1133524697), (0, -20), (-5.8889521452, -19.1133524697))
        make_face()
    extrude(amount=-F2_DEPTH)

    # F3: chamfer of 6 on 4 edges, made by hand


with BuildPart() as f3_tool2:
    # F3_s3 → F3_t4 (revolve)
    with BuildSketch(Plane(origin=(0, 0, 0), x_dir=(0, 1, 0), z_dir=(-0.4797494316, 0, -0.8774055407))):
        Polygon((-1, -20), (5, -26), (5, -20), align=None)
    revolve(axis=Axis((0, 5, 0), (0, 1, 0)), revolution_arc=F3_T4_ANGLE)

    split(bisect_by=Plane.XZ, keep=Keep.BOTTOM)


with BuildPart() as f1_1:
    add(f1.part)

    # F3_t1: cut F3_tool2
    add(f3_tool2.part, mode=Mode.SUBTRACT)


with BuildPart() as f3_tool7:
    # F3_s8 → F3_t9 (revolve)
    with BuildSketch(Plane(origin=(0, 0, 0), x_dir=(0, 1, 0), z_dir=(-0.8774055407, 0, 0.4797494316))):
        Polygon((-1, -20), (5, -26), (5, -20), align=None)
    revolve(axis=Axis((0, 5, 0), (0, 1, 0)), revolution_arc=F3_T9_ANGLE)

    split(bisect_by=Plane.XZ, keep=Keep.BOTTOM)


with BuildPart() as f1_2:
    add(f1_1.part)

    # F3_t6: cut F3_tool7
    add(f3_tool7.part, mode=Mode.SUBTRACT)


with BuildPart() as f3_tool12:
    # F3_s13 → F3_t14 (revolve)
    with BuildSketch(Plane(origin=(0, 0, 0), x_dir=(0, 1, 0), z_dir=(0.8774055407, 0, -0.4797494316))):
        Polygon((-1, -20), (5, -26), (5, -20), align=None)
    revolve(axis=Axis((0, 5, 0), (0, 1, 0)), revolution_arc=F3_T14_ANGLE)

    split(bisect_by=Plane.XZ, keep=Keep.BOTTOM)


with BuildPart() as f1_3:
    add(f1_2.part)

    # F3_t11: cut F3_tool12
    add(f3_tool12.part, mode=Mode.SUBTRACT)


with BuildPart() as f3_tool17:
    # F3_s18 → F3_t19 (revolve)
    with BuildSketch(Plane(origin=(0, 0, 0), x_dir=(0, 1, 0), z_dir=(0.4797494316, 0, 0.8774055407))):
        Polygon((-1, -20), (5, -26), (5, -20), align=None)
    revolve(axis=Axis((0, 5, 0), (0, 1, 0)), revolution_arc=F3_T19_ANGLE)

    split(bisect_by=Plane.XZ, keep=Keep.BOTTOM)


with BuildPart() as f1_4:
    add(f1_3.part)

    # F3_t16: cut F3_tool17
    add(f3_tool17.part, mode=Mode.SUBTRACT)

    # F0 (on Front) → F4 (join)
    with BuildSketch(Plane.XZ):
        Circle(F0_R)
        Circle(F0_R_2, mode=Mode.SUBTRACT)
    extrude(amount=-F4_DEPTH)


solid = f1_4.part
